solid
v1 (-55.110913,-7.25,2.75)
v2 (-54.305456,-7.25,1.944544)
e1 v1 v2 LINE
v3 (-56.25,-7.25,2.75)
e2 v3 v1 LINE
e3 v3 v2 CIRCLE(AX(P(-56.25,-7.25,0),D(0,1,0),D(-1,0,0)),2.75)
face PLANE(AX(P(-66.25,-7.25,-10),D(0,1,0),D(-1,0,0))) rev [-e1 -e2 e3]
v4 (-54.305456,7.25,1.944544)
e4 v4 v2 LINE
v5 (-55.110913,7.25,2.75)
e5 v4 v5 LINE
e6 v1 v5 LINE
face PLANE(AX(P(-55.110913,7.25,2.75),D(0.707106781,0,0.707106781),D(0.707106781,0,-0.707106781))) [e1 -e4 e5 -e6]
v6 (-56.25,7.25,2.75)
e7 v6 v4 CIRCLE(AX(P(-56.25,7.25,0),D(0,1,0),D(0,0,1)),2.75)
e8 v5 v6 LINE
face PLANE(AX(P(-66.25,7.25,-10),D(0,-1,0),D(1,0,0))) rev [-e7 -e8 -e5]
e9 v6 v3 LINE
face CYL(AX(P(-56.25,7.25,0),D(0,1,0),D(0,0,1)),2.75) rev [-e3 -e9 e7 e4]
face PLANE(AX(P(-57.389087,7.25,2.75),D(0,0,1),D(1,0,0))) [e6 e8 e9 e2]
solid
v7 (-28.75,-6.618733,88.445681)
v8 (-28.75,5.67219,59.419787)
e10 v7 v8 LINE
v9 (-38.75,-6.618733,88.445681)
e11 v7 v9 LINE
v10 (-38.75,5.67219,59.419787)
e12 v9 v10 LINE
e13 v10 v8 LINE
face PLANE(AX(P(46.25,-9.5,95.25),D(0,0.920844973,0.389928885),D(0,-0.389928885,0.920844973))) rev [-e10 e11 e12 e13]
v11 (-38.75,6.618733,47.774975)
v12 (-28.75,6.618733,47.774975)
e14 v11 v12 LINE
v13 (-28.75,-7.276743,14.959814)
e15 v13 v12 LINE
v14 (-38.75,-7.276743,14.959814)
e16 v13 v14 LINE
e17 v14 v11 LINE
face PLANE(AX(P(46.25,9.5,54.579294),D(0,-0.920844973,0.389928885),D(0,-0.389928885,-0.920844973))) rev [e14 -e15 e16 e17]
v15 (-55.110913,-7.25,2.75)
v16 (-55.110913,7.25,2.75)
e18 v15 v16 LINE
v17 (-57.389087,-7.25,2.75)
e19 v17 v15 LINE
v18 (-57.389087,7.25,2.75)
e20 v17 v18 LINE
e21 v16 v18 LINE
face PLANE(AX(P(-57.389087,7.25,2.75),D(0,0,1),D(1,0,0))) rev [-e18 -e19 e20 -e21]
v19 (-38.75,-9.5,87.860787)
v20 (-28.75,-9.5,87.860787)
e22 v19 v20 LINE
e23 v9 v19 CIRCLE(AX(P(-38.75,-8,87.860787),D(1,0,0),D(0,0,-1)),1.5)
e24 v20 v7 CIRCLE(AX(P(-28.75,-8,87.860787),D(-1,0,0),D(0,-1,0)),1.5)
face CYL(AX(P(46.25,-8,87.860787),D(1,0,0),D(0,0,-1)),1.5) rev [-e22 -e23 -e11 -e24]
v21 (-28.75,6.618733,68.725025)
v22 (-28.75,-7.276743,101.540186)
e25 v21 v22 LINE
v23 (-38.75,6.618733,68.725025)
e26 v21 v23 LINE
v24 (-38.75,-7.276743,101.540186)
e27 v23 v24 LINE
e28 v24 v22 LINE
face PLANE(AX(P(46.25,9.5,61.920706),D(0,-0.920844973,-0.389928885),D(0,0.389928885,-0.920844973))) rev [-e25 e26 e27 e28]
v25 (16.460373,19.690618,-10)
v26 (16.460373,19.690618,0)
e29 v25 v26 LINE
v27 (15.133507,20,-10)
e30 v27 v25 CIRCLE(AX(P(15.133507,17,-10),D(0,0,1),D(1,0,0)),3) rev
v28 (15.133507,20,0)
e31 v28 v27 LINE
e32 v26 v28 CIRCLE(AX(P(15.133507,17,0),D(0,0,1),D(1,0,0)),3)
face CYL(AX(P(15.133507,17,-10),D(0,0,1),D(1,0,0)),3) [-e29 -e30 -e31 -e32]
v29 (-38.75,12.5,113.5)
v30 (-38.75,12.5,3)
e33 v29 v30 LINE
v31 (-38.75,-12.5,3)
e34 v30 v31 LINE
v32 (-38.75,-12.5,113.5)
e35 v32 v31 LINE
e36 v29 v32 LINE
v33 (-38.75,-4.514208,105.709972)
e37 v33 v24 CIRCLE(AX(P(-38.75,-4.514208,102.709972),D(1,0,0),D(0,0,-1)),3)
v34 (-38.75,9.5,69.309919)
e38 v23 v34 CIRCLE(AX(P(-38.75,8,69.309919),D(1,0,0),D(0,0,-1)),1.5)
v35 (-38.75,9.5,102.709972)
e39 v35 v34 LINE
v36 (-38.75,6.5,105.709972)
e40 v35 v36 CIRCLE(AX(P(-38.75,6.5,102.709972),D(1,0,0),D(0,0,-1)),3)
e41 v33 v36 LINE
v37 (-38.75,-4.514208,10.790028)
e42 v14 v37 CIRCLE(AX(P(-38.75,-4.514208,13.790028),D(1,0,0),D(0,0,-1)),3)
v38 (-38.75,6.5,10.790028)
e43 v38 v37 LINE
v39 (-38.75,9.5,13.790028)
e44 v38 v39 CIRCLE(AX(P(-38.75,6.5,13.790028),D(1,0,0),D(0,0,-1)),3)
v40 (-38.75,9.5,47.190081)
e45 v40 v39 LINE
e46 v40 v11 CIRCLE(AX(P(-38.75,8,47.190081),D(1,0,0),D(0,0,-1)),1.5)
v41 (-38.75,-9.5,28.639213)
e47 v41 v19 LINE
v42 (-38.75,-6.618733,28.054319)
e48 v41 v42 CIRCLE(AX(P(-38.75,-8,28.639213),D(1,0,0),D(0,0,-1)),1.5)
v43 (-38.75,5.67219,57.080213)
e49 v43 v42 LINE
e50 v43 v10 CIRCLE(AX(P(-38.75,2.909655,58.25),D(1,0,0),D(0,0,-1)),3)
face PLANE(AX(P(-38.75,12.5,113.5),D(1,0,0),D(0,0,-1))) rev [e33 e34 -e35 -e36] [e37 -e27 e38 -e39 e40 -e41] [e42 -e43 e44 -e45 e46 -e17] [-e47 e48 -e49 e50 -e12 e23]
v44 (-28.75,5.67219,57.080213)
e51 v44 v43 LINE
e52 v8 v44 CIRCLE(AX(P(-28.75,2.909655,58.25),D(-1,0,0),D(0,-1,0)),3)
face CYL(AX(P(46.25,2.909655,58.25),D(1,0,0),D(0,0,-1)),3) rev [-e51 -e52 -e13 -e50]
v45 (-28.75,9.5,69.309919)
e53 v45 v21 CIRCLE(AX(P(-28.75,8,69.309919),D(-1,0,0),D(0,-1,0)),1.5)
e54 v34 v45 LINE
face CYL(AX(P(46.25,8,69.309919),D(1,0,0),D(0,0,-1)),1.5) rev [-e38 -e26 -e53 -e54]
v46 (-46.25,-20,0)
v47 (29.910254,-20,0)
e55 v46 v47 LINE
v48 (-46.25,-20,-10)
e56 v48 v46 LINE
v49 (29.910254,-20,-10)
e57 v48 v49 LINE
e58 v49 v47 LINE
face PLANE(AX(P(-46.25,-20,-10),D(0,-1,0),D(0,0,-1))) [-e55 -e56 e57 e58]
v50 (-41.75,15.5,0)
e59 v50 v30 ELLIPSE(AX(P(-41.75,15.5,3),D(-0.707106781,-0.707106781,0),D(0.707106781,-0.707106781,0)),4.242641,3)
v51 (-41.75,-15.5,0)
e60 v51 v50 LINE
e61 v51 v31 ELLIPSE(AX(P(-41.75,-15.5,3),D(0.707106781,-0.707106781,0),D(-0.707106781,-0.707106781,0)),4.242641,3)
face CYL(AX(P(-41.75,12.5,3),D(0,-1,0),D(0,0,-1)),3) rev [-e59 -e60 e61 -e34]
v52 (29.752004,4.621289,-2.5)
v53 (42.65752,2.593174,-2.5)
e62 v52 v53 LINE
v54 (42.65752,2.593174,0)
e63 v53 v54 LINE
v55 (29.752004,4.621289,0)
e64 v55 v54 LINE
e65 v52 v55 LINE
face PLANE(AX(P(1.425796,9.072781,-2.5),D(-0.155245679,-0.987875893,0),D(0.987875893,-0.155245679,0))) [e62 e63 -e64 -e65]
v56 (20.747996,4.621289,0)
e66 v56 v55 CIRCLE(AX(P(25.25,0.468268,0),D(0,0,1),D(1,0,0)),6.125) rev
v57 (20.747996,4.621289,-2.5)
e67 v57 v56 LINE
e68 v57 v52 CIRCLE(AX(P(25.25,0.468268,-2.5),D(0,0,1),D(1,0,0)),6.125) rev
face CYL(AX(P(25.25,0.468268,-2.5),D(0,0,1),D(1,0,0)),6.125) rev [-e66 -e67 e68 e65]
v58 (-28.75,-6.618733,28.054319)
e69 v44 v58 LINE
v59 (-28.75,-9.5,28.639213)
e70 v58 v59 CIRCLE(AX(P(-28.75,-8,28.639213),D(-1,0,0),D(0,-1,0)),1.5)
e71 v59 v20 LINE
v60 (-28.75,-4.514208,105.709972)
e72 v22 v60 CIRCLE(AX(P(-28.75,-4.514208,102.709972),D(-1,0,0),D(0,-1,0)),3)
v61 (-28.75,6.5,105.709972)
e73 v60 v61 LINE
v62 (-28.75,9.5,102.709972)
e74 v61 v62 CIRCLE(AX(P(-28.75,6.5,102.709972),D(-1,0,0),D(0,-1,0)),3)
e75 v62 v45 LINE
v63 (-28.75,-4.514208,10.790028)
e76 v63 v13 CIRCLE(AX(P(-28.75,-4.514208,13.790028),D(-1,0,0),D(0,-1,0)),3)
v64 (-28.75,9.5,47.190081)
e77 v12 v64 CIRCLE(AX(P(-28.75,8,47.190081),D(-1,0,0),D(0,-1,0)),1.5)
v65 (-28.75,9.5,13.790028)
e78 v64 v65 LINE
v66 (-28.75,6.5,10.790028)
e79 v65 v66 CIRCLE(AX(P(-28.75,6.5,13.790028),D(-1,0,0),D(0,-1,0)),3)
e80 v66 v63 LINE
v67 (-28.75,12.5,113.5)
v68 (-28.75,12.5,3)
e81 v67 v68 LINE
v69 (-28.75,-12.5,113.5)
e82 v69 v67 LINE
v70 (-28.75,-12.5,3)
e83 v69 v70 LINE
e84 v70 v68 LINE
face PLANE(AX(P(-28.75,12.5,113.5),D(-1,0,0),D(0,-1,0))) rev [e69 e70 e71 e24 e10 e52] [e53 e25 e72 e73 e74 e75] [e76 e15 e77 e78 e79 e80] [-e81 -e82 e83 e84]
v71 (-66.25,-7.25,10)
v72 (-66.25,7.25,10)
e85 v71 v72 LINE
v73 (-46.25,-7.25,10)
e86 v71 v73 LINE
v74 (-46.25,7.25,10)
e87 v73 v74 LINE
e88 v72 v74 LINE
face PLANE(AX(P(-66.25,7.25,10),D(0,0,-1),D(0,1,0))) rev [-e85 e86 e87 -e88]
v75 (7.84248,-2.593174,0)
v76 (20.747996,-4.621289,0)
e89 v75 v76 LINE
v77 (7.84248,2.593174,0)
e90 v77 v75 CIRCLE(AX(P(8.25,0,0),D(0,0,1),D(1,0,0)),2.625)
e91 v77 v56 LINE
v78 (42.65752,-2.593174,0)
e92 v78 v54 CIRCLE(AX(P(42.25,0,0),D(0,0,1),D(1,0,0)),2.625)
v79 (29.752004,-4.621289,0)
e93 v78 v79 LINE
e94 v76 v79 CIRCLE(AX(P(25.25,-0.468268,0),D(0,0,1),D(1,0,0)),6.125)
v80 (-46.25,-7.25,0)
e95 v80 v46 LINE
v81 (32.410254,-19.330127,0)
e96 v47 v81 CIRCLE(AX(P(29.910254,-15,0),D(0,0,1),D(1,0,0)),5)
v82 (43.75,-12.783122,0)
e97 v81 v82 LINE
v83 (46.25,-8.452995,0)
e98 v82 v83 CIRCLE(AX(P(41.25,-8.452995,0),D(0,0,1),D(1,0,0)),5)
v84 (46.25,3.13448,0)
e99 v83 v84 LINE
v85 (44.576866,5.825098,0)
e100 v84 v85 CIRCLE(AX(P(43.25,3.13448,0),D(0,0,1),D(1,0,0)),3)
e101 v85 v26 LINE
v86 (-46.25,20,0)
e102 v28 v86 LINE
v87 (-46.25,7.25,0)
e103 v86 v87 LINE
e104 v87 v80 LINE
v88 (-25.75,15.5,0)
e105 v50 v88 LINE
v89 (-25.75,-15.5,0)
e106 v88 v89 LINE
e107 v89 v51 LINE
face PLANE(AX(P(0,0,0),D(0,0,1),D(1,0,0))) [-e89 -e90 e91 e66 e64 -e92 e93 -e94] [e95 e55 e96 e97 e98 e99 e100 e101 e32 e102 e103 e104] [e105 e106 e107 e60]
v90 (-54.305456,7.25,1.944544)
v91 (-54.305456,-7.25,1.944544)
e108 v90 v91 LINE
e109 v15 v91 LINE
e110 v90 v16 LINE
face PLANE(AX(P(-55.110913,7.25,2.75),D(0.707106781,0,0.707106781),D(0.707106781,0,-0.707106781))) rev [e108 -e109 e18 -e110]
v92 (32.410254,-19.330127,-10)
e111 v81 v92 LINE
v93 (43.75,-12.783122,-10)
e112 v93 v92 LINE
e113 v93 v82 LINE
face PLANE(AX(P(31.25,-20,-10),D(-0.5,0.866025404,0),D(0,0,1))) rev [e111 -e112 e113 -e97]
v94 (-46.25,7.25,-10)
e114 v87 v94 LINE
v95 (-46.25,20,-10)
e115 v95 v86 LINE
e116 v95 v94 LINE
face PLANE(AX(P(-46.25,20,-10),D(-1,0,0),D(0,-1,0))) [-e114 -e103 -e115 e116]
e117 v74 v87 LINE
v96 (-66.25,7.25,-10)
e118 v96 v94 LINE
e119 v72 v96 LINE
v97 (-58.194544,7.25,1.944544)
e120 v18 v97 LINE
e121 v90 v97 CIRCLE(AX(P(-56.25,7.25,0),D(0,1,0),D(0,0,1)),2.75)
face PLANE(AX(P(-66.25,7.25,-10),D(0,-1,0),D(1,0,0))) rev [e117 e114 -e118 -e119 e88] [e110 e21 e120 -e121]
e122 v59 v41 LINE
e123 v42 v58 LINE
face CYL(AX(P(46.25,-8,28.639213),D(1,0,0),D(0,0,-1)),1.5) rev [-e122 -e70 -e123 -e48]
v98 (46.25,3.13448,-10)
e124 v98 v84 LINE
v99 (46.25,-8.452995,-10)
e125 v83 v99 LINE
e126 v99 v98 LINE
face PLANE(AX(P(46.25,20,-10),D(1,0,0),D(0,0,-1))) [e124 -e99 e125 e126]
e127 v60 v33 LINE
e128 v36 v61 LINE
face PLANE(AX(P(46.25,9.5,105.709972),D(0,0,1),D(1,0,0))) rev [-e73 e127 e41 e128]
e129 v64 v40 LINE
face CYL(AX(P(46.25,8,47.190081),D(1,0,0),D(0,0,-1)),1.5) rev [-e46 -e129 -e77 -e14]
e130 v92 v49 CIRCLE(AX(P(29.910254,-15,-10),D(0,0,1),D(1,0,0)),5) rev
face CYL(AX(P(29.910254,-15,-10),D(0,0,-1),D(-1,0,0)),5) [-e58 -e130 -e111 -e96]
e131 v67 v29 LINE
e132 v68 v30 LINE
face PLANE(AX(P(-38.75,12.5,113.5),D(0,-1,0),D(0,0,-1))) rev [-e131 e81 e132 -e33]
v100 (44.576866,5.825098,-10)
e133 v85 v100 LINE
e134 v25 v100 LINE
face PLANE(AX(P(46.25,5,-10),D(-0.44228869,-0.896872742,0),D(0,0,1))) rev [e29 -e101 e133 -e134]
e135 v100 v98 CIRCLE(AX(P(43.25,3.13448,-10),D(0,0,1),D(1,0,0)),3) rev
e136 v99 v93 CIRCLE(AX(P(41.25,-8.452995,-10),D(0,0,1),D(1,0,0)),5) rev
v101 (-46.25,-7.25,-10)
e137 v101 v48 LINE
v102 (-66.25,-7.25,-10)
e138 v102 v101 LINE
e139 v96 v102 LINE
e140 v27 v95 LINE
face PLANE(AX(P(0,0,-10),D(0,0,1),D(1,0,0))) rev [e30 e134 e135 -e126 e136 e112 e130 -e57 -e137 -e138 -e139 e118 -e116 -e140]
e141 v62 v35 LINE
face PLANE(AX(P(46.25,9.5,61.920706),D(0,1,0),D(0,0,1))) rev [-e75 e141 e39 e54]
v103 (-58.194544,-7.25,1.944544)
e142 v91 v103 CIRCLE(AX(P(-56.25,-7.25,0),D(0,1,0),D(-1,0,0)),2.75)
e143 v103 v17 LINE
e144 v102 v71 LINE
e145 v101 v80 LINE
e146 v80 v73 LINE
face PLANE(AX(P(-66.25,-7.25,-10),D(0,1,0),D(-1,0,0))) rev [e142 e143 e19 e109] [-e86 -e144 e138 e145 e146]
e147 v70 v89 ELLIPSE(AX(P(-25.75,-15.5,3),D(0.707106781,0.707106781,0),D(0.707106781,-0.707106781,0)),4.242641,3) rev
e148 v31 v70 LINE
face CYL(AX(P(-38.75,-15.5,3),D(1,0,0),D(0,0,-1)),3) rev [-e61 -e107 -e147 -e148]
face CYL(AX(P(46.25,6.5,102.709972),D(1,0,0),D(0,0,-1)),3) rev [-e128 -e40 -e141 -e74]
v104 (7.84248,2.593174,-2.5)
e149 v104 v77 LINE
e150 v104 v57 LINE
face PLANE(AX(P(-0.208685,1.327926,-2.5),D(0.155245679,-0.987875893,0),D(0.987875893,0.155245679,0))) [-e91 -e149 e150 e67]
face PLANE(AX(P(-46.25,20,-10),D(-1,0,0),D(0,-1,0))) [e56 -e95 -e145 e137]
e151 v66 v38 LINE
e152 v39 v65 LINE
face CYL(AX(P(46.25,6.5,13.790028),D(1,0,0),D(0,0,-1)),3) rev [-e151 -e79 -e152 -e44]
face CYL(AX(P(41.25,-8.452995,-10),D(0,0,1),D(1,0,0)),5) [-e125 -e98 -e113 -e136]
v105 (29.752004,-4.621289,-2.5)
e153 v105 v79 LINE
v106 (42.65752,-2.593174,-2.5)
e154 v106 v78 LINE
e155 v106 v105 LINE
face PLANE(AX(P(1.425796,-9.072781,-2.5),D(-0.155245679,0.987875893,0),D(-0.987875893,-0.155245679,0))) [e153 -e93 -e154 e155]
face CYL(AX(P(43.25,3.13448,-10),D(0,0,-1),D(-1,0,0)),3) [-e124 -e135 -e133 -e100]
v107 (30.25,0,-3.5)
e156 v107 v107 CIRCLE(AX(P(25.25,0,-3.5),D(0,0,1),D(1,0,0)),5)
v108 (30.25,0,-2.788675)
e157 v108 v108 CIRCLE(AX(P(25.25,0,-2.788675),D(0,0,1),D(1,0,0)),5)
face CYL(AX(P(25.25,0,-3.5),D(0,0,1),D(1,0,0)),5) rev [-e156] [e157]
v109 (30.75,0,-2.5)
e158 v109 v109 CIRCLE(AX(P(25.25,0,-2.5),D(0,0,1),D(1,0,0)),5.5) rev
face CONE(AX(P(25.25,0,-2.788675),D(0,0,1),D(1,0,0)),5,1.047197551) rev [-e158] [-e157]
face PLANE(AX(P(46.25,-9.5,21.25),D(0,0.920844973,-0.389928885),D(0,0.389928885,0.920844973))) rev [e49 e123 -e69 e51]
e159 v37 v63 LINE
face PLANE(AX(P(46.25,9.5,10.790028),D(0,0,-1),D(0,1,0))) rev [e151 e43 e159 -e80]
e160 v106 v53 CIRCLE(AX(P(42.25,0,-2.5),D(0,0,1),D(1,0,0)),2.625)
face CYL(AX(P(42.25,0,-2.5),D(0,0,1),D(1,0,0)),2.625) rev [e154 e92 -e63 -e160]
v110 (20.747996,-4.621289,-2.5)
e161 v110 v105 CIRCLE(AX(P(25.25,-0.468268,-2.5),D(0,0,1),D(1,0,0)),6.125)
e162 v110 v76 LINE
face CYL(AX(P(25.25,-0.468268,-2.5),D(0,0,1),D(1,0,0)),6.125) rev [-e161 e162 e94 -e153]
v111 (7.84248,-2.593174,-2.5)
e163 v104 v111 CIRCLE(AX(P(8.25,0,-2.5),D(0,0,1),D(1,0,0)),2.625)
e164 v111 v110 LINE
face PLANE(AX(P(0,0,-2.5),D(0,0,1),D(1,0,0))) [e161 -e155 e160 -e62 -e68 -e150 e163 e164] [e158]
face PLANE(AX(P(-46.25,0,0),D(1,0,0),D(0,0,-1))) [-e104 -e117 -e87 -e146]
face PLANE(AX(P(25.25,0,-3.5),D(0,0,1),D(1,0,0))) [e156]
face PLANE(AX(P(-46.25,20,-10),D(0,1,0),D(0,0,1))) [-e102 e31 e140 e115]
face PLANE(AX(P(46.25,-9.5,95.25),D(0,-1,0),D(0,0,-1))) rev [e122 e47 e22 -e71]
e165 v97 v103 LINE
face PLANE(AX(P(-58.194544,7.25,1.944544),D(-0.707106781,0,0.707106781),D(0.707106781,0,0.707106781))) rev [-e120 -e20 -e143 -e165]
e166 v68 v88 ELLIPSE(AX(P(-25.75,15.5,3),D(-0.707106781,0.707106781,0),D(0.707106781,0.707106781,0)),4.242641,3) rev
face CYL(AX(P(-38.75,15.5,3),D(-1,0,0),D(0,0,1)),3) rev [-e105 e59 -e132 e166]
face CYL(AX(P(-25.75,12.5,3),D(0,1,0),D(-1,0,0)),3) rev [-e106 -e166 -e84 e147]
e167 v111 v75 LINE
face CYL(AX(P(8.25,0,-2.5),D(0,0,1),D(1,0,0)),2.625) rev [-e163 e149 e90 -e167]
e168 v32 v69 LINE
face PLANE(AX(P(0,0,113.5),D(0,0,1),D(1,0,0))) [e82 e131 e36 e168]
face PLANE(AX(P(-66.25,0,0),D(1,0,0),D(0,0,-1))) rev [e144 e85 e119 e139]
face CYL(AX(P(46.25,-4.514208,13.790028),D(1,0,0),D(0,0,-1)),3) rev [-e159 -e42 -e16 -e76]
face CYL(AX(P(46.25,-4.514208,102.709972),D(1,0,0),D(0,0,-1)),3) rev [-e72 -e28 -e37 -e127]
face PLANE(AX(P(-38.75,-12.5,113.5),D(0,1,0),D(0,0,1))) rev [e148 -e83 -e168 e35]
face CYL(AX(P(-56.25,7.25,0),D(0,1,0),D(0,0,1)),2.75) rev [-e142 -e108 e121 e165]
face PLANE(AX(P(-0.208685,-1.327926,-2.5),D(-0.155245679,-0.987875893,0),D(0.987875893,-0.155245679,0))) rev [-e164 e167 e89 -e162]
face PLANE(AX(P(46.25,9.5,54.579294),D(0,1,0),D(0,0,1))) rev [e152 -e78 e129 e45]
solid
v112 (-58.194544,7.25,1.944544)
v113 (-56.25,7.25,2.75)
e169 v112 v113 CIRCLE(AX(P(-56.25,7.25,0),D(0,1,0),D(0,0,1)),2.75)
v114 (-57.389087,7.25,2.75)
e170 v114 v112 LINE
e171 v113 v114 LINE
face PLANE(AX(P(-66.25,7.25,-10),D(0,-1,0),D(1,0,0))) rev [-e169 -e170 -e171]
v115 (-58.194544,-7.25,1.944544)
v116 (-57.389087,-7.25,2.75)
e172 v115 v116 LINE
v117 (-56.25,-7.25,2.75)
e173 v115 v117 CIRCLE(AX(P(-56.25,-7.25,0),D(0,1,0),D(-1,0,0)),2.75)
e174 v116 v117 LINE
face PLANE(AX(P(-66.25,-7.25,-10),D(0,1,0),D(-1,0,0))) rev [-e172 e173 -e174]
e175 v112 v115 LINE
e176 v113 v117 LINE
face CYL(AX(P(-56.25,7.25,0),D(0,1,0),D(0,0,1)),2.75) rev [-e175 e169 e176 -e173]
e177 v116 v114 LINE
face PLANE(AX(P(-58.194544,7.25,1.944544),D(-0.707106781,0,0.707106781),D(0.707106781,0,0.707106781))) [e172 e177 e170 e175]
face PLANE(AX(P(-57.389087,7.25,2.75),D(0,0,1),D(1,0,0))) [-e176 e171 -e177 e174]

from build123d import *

# Parameters (mm, degrees)
SKETCH3_W            = 92.5
SKETCH3_H            = 40
BOSS_EXTRUDE1_DEPTH  = 10
CUT_EXTRUDE1_DEPTH   = 2.5
SKETCH21_W           = 10
SKETCH21_H           = 25
BOSS_EXTRUDE11_DEPTH = 113.5
FILLET1_R            = 3
CUT_EXTRUDE2_DEPTH   = 144.203526493
FILLET4_R            = 3
FILLET5_R            = 1.5
SKETCH25_W           = 20
SKETCH25_H           = 14.5
BOSS_EXTRUDE12_DEPTH = 20
M5_CLEARANCE_HOLE1_D = 5.5
CHAMFER1_SIZE        = 15
CHAMFER1_SIZE2       = 30.41699103
CHAMFER2_SIZE        = 15
CHAMFER2_SIZE2       = 8.660254038
FILLET6_R            = 3
FILLET7_R            = 5
SKETCH28_R           = 5
CUT_EXTRUDE3_DEPTH   = 1
CHAMFER3_SIZE        = 0.5
CHAMFER3_SIZE2       = 0.288675135
SPLIT1_START         = -7.25
SPLIT1_DEPTH         = 14.5
SPLIT1_2_DEPTH       = 14.5
SPLIT1_3_DEPTH       = 14.5


# Read off the part's stored shape, not the designer's step: Split1
with BuildPart() as part:
    # Sketch3 → Boss-Extrude1 (new body)
    with BuildSketch(Plane.XY):
        Rectangle(SKETCH3_W, SKETCH3_H)
    extrude(amount=-BOSS_EXTRUDE1_DEPTH)

    # Sketch2 → Cut-Extrude1 (cut)
    with BuildSketch(Plane.XY):
        with BuildLine():
            Line((7.842480092, 2.593174218), (20.7479962, 4.621288911))
            ThreePointArc((20.7479962, 4.621288911), (25.25, 6.593267506), (29.7520038, 4.621288911))
            Line((29.7520038, 4.621288911), (42.657519908, 2.593174218))
            ThreePointArc((42.657519908, 2.593174218), (44.875, 0), (42.657519908, -2.593174218))
            Line((42.657519908, -2.593174218), (29.7520038, -4.621288911))
            ThreePointArc((29.7520038, -4.621288911), (25.25, -6.593267506), (20.7479962, -4.621288911))
            Line((20.7479962, -4.621288911), (7.842480092, -2.593174218))
            ThreePointArc((7.842480092, -2.593174218), (5.625, 0), (7.842480092, 2.593174218))
        make_face()
    extrude(amount=-CUT_EXTRUDE1_DEPTH, mode=Mode.SUBTRACT)

    # Sketch21 → Boss-Extrude11 (add)
    with BuildSketch(Plane.XY):
        with Locations((-33.75, 0)):
            Rectangle(SKETCH21_W, SKETCH21_H)
    extrude(amount=BOSS_EXTRUDE11_DEPTH)

    # Fillet1
    fillet1_edges = [part.edges().sort_by_distance(p)[0] for p in [
        (-28.75, 0, 0),
        (-33.75, 12.5, 0),
        (-38.75, 0, 0),
        (-33.75, -12.5, 0),
    ]]
    fillet(fillet1_edges, radius=FILLET1_R)

    # Sketch24 → Cut-Extrude2 (cut, through all)
    with BuildSketch(Plane.ZY.offset(38.75)):
        Polygon((95.25, -9.5), (21.25, -9.5), (58.25, 6.167532718), align=None)
        Polygon((54.57929411, 9.5), (10.790027833, -9.042426002), (10.790027833, 9.5), align=None)
        Polygon((61.92070589, 9.5), (105.709972167, 9.5), (105.709972167, -9.042426002), align=None)
    extrude(amount=-CUT_EXTRUDE2_DEPTH, mode=Mode.SUBTRACT)

    # Fillet4
    fillet4_edges = [part.edges().sort_by_distance(p)[0] for p in [
        (-33.75, 9.5, 10.790027833),
        (-33.75, -9.042426002, 10.790027833),
        (-33.75, -9.042426002, 105.709972167),
        (-33.75, 9.5, 105.709972167),
        (-33.75, 6.167532718, 58.25),
    ]]
    fillet(fillet4_edges, radius=FILLET4_R)

    # Fillet5
    fillet5_edges = [part.edges().sort_by_distance(p)[0] for p in [
        (-33.75, 9.5, 54.57929411),
        (-33.75, 9.5, 61.92070589),
        (-33.75, -9.5, 95.25),
        (-33.75, -9.5, 21.25),
    ]]
    fillet(fillet5_edges, radius=FILLET5_R)

    # Sketch25 → Boss-Extrude12 (add)
    with BuildSketch(Plane.ZY.offset(46.25)):
        Rectangle(SKETCH25_W, SKETCH25_H)
    extrude(amount=BOSS_EXTRUDE12_DEPTH)

    # M5 Clearance Hole1 (through all)
    with Locations(Plane(origin=(0, 7.25, 0), x_dir=(1, 0, 0), z_dir=(0, 1, 0))):
        with Locations((-56.25, 0)):
            Hole(M5_CLEARANCE_HOLE1_D / 2)

    # Chamfer1
    chamfer1_edges = [part.edges().sort_by_distance(p)[0] for p in [
        (46.25, 20, -5),
    ]]
    chamfer1_side = [part.faces().sort_by_distance(p)[0] for p in [
        (46.25, 0, -5),
    ]]
    chamfer(chamfer1_edges, length=CHAMFER1_SIZE, length2=CHAMFER1_SIZE2, reference=chamfer1_side[0])

    # Chamfer2
    chamfer2_edges = [part.edges().sort_by_distance(p)[0] for p in [
        (46.25, -20, -5),
    ]]
    chamfer2_side = [part.faces().sort_by_distance(p)[0] for p in [
        (0, -20, -5),
    ]]
    chamfer(chamfer2_edges, length=CHAMFER2_SIZE, length2=CHAMFER2_SIZE2, reference=chamfer2_side[0])

    # Fillet6
    fillet6_edges = [part.edges().sort_by_distance(p)[0] for p in [
        (46.25, 5, -5),
        (15.83300897, 20, -5),
    ]]
    fillet(fillet6_edges, radius=FILLET6_R)

    # Fillet7
    fillet7_edges = [part.edges().sort_by_distance(p)[0] for p in [
        (31.25, -20, -5),
        (46.25, -11.339745962, -5),
    ]]
    fillet(fillet7_edges, radius=FILLET7_R)

    # Sketch28 → Cut-Extrude3 (cut)
    with BuildSketch(Plane.XY.offset(-2.5)):
        with Locations((25.25, 0)):
            Circle(SKETCH28_R)
    extrude(amount=-CUT_EXTRUDE3_DEPTH, mode=Mode.SUBTRACT)

    # Chamfer3
    chamfer3_edges = [part.edges().sort_by_distance(p)[0] for p in [
        (20.25, 0, -2.5),
    ]]
    chamfer3_side = [part.faces().sort_by_distance(p)[0] for p in [
        (14.359518991, -3.198192821, -2.5),
    ]]
    chamfer(chamfer3_edges, length=CHAMFER3_SIZE, length2=CHAMFER3_SIZE2, reference=chamfer3_side[0])

    # Split1 2 outline → Split1 2 (cut)
    with BuildSketch(Plane(origin=(0, 0, 0), x_dir=(1, 0, 0), z_dir=(0, 1, 0)).offset(SPLIT1_START)):
        with BuildLine():
            ThreePointArc((-56.25, -2.75), (-57.302379439, -2.540668714), (-58.194543648, -1.944543648))
            Line((-58.194543648, -1.944543648), (-57.389087297, -2.75))
            Line((-57.389087297, -2.75), (-56.25, -2.75))
        make_face()
        with BuildLine():
            ThreePointArc((-54.305456352, -1.944543648), (-55.197620561, -2.540668714), (-56.25, -2.75))
            Line((-56.25, -2.75), (-55.110912703, -2.75))
            Line((-55.110912703, -2.75), (-54.305456352, -1.944543648))
        make_face()
    extrude(amount=SPLIT1_2_DEPTH, mode=Mode.SUBTRACT)


with BuildPart() as body_2:
    # Split1 outline → Split1 (new body)
    with BuildSketch(Plane(origin=(0, 0, 0), x_dir=(1, 0, 0), z_dir=(0, 1, 0)).offset(SPLIT1_START)):
        with BuildLine():
            Line((-58.194543648, -1.944543648), (-57.389087297, -2.75))
            Line((-57.389087297, -2.75), (-56.25, -2.75))
            ThreePointArc((-56.25, -2.75), (-57.302379439, -2.540668714), (-58.194543648, -1.944543648))
        make_face()
    extrude(amount=SPLIT1_DEPTH)


with BuildPart() as body_3:
    # Split1 3 outline → Split1 3 (new body)
    with BuildSketch(Plane(origin=(0, 0, 0), x_dir=(1, 0, 0), z_dir=(0, 1, 0)).offset(SPLIT1_START)):
        with BuildLine():
            Line((-56.25, -2.75), (-55.110912703, -2.75))
            Line((-55.110912703, -2.75), (-54.305456352, -1.944543648))
            ThreePointArc((-54.305456352, -1.944543648), (-55.197620561, -2.540668714), (-56.25, -2.75))
        make_face()
    extrude(amount=SPLIT1_3_DEPTH)


solid = Compound([part.part, body_2.part, body_3.part])
